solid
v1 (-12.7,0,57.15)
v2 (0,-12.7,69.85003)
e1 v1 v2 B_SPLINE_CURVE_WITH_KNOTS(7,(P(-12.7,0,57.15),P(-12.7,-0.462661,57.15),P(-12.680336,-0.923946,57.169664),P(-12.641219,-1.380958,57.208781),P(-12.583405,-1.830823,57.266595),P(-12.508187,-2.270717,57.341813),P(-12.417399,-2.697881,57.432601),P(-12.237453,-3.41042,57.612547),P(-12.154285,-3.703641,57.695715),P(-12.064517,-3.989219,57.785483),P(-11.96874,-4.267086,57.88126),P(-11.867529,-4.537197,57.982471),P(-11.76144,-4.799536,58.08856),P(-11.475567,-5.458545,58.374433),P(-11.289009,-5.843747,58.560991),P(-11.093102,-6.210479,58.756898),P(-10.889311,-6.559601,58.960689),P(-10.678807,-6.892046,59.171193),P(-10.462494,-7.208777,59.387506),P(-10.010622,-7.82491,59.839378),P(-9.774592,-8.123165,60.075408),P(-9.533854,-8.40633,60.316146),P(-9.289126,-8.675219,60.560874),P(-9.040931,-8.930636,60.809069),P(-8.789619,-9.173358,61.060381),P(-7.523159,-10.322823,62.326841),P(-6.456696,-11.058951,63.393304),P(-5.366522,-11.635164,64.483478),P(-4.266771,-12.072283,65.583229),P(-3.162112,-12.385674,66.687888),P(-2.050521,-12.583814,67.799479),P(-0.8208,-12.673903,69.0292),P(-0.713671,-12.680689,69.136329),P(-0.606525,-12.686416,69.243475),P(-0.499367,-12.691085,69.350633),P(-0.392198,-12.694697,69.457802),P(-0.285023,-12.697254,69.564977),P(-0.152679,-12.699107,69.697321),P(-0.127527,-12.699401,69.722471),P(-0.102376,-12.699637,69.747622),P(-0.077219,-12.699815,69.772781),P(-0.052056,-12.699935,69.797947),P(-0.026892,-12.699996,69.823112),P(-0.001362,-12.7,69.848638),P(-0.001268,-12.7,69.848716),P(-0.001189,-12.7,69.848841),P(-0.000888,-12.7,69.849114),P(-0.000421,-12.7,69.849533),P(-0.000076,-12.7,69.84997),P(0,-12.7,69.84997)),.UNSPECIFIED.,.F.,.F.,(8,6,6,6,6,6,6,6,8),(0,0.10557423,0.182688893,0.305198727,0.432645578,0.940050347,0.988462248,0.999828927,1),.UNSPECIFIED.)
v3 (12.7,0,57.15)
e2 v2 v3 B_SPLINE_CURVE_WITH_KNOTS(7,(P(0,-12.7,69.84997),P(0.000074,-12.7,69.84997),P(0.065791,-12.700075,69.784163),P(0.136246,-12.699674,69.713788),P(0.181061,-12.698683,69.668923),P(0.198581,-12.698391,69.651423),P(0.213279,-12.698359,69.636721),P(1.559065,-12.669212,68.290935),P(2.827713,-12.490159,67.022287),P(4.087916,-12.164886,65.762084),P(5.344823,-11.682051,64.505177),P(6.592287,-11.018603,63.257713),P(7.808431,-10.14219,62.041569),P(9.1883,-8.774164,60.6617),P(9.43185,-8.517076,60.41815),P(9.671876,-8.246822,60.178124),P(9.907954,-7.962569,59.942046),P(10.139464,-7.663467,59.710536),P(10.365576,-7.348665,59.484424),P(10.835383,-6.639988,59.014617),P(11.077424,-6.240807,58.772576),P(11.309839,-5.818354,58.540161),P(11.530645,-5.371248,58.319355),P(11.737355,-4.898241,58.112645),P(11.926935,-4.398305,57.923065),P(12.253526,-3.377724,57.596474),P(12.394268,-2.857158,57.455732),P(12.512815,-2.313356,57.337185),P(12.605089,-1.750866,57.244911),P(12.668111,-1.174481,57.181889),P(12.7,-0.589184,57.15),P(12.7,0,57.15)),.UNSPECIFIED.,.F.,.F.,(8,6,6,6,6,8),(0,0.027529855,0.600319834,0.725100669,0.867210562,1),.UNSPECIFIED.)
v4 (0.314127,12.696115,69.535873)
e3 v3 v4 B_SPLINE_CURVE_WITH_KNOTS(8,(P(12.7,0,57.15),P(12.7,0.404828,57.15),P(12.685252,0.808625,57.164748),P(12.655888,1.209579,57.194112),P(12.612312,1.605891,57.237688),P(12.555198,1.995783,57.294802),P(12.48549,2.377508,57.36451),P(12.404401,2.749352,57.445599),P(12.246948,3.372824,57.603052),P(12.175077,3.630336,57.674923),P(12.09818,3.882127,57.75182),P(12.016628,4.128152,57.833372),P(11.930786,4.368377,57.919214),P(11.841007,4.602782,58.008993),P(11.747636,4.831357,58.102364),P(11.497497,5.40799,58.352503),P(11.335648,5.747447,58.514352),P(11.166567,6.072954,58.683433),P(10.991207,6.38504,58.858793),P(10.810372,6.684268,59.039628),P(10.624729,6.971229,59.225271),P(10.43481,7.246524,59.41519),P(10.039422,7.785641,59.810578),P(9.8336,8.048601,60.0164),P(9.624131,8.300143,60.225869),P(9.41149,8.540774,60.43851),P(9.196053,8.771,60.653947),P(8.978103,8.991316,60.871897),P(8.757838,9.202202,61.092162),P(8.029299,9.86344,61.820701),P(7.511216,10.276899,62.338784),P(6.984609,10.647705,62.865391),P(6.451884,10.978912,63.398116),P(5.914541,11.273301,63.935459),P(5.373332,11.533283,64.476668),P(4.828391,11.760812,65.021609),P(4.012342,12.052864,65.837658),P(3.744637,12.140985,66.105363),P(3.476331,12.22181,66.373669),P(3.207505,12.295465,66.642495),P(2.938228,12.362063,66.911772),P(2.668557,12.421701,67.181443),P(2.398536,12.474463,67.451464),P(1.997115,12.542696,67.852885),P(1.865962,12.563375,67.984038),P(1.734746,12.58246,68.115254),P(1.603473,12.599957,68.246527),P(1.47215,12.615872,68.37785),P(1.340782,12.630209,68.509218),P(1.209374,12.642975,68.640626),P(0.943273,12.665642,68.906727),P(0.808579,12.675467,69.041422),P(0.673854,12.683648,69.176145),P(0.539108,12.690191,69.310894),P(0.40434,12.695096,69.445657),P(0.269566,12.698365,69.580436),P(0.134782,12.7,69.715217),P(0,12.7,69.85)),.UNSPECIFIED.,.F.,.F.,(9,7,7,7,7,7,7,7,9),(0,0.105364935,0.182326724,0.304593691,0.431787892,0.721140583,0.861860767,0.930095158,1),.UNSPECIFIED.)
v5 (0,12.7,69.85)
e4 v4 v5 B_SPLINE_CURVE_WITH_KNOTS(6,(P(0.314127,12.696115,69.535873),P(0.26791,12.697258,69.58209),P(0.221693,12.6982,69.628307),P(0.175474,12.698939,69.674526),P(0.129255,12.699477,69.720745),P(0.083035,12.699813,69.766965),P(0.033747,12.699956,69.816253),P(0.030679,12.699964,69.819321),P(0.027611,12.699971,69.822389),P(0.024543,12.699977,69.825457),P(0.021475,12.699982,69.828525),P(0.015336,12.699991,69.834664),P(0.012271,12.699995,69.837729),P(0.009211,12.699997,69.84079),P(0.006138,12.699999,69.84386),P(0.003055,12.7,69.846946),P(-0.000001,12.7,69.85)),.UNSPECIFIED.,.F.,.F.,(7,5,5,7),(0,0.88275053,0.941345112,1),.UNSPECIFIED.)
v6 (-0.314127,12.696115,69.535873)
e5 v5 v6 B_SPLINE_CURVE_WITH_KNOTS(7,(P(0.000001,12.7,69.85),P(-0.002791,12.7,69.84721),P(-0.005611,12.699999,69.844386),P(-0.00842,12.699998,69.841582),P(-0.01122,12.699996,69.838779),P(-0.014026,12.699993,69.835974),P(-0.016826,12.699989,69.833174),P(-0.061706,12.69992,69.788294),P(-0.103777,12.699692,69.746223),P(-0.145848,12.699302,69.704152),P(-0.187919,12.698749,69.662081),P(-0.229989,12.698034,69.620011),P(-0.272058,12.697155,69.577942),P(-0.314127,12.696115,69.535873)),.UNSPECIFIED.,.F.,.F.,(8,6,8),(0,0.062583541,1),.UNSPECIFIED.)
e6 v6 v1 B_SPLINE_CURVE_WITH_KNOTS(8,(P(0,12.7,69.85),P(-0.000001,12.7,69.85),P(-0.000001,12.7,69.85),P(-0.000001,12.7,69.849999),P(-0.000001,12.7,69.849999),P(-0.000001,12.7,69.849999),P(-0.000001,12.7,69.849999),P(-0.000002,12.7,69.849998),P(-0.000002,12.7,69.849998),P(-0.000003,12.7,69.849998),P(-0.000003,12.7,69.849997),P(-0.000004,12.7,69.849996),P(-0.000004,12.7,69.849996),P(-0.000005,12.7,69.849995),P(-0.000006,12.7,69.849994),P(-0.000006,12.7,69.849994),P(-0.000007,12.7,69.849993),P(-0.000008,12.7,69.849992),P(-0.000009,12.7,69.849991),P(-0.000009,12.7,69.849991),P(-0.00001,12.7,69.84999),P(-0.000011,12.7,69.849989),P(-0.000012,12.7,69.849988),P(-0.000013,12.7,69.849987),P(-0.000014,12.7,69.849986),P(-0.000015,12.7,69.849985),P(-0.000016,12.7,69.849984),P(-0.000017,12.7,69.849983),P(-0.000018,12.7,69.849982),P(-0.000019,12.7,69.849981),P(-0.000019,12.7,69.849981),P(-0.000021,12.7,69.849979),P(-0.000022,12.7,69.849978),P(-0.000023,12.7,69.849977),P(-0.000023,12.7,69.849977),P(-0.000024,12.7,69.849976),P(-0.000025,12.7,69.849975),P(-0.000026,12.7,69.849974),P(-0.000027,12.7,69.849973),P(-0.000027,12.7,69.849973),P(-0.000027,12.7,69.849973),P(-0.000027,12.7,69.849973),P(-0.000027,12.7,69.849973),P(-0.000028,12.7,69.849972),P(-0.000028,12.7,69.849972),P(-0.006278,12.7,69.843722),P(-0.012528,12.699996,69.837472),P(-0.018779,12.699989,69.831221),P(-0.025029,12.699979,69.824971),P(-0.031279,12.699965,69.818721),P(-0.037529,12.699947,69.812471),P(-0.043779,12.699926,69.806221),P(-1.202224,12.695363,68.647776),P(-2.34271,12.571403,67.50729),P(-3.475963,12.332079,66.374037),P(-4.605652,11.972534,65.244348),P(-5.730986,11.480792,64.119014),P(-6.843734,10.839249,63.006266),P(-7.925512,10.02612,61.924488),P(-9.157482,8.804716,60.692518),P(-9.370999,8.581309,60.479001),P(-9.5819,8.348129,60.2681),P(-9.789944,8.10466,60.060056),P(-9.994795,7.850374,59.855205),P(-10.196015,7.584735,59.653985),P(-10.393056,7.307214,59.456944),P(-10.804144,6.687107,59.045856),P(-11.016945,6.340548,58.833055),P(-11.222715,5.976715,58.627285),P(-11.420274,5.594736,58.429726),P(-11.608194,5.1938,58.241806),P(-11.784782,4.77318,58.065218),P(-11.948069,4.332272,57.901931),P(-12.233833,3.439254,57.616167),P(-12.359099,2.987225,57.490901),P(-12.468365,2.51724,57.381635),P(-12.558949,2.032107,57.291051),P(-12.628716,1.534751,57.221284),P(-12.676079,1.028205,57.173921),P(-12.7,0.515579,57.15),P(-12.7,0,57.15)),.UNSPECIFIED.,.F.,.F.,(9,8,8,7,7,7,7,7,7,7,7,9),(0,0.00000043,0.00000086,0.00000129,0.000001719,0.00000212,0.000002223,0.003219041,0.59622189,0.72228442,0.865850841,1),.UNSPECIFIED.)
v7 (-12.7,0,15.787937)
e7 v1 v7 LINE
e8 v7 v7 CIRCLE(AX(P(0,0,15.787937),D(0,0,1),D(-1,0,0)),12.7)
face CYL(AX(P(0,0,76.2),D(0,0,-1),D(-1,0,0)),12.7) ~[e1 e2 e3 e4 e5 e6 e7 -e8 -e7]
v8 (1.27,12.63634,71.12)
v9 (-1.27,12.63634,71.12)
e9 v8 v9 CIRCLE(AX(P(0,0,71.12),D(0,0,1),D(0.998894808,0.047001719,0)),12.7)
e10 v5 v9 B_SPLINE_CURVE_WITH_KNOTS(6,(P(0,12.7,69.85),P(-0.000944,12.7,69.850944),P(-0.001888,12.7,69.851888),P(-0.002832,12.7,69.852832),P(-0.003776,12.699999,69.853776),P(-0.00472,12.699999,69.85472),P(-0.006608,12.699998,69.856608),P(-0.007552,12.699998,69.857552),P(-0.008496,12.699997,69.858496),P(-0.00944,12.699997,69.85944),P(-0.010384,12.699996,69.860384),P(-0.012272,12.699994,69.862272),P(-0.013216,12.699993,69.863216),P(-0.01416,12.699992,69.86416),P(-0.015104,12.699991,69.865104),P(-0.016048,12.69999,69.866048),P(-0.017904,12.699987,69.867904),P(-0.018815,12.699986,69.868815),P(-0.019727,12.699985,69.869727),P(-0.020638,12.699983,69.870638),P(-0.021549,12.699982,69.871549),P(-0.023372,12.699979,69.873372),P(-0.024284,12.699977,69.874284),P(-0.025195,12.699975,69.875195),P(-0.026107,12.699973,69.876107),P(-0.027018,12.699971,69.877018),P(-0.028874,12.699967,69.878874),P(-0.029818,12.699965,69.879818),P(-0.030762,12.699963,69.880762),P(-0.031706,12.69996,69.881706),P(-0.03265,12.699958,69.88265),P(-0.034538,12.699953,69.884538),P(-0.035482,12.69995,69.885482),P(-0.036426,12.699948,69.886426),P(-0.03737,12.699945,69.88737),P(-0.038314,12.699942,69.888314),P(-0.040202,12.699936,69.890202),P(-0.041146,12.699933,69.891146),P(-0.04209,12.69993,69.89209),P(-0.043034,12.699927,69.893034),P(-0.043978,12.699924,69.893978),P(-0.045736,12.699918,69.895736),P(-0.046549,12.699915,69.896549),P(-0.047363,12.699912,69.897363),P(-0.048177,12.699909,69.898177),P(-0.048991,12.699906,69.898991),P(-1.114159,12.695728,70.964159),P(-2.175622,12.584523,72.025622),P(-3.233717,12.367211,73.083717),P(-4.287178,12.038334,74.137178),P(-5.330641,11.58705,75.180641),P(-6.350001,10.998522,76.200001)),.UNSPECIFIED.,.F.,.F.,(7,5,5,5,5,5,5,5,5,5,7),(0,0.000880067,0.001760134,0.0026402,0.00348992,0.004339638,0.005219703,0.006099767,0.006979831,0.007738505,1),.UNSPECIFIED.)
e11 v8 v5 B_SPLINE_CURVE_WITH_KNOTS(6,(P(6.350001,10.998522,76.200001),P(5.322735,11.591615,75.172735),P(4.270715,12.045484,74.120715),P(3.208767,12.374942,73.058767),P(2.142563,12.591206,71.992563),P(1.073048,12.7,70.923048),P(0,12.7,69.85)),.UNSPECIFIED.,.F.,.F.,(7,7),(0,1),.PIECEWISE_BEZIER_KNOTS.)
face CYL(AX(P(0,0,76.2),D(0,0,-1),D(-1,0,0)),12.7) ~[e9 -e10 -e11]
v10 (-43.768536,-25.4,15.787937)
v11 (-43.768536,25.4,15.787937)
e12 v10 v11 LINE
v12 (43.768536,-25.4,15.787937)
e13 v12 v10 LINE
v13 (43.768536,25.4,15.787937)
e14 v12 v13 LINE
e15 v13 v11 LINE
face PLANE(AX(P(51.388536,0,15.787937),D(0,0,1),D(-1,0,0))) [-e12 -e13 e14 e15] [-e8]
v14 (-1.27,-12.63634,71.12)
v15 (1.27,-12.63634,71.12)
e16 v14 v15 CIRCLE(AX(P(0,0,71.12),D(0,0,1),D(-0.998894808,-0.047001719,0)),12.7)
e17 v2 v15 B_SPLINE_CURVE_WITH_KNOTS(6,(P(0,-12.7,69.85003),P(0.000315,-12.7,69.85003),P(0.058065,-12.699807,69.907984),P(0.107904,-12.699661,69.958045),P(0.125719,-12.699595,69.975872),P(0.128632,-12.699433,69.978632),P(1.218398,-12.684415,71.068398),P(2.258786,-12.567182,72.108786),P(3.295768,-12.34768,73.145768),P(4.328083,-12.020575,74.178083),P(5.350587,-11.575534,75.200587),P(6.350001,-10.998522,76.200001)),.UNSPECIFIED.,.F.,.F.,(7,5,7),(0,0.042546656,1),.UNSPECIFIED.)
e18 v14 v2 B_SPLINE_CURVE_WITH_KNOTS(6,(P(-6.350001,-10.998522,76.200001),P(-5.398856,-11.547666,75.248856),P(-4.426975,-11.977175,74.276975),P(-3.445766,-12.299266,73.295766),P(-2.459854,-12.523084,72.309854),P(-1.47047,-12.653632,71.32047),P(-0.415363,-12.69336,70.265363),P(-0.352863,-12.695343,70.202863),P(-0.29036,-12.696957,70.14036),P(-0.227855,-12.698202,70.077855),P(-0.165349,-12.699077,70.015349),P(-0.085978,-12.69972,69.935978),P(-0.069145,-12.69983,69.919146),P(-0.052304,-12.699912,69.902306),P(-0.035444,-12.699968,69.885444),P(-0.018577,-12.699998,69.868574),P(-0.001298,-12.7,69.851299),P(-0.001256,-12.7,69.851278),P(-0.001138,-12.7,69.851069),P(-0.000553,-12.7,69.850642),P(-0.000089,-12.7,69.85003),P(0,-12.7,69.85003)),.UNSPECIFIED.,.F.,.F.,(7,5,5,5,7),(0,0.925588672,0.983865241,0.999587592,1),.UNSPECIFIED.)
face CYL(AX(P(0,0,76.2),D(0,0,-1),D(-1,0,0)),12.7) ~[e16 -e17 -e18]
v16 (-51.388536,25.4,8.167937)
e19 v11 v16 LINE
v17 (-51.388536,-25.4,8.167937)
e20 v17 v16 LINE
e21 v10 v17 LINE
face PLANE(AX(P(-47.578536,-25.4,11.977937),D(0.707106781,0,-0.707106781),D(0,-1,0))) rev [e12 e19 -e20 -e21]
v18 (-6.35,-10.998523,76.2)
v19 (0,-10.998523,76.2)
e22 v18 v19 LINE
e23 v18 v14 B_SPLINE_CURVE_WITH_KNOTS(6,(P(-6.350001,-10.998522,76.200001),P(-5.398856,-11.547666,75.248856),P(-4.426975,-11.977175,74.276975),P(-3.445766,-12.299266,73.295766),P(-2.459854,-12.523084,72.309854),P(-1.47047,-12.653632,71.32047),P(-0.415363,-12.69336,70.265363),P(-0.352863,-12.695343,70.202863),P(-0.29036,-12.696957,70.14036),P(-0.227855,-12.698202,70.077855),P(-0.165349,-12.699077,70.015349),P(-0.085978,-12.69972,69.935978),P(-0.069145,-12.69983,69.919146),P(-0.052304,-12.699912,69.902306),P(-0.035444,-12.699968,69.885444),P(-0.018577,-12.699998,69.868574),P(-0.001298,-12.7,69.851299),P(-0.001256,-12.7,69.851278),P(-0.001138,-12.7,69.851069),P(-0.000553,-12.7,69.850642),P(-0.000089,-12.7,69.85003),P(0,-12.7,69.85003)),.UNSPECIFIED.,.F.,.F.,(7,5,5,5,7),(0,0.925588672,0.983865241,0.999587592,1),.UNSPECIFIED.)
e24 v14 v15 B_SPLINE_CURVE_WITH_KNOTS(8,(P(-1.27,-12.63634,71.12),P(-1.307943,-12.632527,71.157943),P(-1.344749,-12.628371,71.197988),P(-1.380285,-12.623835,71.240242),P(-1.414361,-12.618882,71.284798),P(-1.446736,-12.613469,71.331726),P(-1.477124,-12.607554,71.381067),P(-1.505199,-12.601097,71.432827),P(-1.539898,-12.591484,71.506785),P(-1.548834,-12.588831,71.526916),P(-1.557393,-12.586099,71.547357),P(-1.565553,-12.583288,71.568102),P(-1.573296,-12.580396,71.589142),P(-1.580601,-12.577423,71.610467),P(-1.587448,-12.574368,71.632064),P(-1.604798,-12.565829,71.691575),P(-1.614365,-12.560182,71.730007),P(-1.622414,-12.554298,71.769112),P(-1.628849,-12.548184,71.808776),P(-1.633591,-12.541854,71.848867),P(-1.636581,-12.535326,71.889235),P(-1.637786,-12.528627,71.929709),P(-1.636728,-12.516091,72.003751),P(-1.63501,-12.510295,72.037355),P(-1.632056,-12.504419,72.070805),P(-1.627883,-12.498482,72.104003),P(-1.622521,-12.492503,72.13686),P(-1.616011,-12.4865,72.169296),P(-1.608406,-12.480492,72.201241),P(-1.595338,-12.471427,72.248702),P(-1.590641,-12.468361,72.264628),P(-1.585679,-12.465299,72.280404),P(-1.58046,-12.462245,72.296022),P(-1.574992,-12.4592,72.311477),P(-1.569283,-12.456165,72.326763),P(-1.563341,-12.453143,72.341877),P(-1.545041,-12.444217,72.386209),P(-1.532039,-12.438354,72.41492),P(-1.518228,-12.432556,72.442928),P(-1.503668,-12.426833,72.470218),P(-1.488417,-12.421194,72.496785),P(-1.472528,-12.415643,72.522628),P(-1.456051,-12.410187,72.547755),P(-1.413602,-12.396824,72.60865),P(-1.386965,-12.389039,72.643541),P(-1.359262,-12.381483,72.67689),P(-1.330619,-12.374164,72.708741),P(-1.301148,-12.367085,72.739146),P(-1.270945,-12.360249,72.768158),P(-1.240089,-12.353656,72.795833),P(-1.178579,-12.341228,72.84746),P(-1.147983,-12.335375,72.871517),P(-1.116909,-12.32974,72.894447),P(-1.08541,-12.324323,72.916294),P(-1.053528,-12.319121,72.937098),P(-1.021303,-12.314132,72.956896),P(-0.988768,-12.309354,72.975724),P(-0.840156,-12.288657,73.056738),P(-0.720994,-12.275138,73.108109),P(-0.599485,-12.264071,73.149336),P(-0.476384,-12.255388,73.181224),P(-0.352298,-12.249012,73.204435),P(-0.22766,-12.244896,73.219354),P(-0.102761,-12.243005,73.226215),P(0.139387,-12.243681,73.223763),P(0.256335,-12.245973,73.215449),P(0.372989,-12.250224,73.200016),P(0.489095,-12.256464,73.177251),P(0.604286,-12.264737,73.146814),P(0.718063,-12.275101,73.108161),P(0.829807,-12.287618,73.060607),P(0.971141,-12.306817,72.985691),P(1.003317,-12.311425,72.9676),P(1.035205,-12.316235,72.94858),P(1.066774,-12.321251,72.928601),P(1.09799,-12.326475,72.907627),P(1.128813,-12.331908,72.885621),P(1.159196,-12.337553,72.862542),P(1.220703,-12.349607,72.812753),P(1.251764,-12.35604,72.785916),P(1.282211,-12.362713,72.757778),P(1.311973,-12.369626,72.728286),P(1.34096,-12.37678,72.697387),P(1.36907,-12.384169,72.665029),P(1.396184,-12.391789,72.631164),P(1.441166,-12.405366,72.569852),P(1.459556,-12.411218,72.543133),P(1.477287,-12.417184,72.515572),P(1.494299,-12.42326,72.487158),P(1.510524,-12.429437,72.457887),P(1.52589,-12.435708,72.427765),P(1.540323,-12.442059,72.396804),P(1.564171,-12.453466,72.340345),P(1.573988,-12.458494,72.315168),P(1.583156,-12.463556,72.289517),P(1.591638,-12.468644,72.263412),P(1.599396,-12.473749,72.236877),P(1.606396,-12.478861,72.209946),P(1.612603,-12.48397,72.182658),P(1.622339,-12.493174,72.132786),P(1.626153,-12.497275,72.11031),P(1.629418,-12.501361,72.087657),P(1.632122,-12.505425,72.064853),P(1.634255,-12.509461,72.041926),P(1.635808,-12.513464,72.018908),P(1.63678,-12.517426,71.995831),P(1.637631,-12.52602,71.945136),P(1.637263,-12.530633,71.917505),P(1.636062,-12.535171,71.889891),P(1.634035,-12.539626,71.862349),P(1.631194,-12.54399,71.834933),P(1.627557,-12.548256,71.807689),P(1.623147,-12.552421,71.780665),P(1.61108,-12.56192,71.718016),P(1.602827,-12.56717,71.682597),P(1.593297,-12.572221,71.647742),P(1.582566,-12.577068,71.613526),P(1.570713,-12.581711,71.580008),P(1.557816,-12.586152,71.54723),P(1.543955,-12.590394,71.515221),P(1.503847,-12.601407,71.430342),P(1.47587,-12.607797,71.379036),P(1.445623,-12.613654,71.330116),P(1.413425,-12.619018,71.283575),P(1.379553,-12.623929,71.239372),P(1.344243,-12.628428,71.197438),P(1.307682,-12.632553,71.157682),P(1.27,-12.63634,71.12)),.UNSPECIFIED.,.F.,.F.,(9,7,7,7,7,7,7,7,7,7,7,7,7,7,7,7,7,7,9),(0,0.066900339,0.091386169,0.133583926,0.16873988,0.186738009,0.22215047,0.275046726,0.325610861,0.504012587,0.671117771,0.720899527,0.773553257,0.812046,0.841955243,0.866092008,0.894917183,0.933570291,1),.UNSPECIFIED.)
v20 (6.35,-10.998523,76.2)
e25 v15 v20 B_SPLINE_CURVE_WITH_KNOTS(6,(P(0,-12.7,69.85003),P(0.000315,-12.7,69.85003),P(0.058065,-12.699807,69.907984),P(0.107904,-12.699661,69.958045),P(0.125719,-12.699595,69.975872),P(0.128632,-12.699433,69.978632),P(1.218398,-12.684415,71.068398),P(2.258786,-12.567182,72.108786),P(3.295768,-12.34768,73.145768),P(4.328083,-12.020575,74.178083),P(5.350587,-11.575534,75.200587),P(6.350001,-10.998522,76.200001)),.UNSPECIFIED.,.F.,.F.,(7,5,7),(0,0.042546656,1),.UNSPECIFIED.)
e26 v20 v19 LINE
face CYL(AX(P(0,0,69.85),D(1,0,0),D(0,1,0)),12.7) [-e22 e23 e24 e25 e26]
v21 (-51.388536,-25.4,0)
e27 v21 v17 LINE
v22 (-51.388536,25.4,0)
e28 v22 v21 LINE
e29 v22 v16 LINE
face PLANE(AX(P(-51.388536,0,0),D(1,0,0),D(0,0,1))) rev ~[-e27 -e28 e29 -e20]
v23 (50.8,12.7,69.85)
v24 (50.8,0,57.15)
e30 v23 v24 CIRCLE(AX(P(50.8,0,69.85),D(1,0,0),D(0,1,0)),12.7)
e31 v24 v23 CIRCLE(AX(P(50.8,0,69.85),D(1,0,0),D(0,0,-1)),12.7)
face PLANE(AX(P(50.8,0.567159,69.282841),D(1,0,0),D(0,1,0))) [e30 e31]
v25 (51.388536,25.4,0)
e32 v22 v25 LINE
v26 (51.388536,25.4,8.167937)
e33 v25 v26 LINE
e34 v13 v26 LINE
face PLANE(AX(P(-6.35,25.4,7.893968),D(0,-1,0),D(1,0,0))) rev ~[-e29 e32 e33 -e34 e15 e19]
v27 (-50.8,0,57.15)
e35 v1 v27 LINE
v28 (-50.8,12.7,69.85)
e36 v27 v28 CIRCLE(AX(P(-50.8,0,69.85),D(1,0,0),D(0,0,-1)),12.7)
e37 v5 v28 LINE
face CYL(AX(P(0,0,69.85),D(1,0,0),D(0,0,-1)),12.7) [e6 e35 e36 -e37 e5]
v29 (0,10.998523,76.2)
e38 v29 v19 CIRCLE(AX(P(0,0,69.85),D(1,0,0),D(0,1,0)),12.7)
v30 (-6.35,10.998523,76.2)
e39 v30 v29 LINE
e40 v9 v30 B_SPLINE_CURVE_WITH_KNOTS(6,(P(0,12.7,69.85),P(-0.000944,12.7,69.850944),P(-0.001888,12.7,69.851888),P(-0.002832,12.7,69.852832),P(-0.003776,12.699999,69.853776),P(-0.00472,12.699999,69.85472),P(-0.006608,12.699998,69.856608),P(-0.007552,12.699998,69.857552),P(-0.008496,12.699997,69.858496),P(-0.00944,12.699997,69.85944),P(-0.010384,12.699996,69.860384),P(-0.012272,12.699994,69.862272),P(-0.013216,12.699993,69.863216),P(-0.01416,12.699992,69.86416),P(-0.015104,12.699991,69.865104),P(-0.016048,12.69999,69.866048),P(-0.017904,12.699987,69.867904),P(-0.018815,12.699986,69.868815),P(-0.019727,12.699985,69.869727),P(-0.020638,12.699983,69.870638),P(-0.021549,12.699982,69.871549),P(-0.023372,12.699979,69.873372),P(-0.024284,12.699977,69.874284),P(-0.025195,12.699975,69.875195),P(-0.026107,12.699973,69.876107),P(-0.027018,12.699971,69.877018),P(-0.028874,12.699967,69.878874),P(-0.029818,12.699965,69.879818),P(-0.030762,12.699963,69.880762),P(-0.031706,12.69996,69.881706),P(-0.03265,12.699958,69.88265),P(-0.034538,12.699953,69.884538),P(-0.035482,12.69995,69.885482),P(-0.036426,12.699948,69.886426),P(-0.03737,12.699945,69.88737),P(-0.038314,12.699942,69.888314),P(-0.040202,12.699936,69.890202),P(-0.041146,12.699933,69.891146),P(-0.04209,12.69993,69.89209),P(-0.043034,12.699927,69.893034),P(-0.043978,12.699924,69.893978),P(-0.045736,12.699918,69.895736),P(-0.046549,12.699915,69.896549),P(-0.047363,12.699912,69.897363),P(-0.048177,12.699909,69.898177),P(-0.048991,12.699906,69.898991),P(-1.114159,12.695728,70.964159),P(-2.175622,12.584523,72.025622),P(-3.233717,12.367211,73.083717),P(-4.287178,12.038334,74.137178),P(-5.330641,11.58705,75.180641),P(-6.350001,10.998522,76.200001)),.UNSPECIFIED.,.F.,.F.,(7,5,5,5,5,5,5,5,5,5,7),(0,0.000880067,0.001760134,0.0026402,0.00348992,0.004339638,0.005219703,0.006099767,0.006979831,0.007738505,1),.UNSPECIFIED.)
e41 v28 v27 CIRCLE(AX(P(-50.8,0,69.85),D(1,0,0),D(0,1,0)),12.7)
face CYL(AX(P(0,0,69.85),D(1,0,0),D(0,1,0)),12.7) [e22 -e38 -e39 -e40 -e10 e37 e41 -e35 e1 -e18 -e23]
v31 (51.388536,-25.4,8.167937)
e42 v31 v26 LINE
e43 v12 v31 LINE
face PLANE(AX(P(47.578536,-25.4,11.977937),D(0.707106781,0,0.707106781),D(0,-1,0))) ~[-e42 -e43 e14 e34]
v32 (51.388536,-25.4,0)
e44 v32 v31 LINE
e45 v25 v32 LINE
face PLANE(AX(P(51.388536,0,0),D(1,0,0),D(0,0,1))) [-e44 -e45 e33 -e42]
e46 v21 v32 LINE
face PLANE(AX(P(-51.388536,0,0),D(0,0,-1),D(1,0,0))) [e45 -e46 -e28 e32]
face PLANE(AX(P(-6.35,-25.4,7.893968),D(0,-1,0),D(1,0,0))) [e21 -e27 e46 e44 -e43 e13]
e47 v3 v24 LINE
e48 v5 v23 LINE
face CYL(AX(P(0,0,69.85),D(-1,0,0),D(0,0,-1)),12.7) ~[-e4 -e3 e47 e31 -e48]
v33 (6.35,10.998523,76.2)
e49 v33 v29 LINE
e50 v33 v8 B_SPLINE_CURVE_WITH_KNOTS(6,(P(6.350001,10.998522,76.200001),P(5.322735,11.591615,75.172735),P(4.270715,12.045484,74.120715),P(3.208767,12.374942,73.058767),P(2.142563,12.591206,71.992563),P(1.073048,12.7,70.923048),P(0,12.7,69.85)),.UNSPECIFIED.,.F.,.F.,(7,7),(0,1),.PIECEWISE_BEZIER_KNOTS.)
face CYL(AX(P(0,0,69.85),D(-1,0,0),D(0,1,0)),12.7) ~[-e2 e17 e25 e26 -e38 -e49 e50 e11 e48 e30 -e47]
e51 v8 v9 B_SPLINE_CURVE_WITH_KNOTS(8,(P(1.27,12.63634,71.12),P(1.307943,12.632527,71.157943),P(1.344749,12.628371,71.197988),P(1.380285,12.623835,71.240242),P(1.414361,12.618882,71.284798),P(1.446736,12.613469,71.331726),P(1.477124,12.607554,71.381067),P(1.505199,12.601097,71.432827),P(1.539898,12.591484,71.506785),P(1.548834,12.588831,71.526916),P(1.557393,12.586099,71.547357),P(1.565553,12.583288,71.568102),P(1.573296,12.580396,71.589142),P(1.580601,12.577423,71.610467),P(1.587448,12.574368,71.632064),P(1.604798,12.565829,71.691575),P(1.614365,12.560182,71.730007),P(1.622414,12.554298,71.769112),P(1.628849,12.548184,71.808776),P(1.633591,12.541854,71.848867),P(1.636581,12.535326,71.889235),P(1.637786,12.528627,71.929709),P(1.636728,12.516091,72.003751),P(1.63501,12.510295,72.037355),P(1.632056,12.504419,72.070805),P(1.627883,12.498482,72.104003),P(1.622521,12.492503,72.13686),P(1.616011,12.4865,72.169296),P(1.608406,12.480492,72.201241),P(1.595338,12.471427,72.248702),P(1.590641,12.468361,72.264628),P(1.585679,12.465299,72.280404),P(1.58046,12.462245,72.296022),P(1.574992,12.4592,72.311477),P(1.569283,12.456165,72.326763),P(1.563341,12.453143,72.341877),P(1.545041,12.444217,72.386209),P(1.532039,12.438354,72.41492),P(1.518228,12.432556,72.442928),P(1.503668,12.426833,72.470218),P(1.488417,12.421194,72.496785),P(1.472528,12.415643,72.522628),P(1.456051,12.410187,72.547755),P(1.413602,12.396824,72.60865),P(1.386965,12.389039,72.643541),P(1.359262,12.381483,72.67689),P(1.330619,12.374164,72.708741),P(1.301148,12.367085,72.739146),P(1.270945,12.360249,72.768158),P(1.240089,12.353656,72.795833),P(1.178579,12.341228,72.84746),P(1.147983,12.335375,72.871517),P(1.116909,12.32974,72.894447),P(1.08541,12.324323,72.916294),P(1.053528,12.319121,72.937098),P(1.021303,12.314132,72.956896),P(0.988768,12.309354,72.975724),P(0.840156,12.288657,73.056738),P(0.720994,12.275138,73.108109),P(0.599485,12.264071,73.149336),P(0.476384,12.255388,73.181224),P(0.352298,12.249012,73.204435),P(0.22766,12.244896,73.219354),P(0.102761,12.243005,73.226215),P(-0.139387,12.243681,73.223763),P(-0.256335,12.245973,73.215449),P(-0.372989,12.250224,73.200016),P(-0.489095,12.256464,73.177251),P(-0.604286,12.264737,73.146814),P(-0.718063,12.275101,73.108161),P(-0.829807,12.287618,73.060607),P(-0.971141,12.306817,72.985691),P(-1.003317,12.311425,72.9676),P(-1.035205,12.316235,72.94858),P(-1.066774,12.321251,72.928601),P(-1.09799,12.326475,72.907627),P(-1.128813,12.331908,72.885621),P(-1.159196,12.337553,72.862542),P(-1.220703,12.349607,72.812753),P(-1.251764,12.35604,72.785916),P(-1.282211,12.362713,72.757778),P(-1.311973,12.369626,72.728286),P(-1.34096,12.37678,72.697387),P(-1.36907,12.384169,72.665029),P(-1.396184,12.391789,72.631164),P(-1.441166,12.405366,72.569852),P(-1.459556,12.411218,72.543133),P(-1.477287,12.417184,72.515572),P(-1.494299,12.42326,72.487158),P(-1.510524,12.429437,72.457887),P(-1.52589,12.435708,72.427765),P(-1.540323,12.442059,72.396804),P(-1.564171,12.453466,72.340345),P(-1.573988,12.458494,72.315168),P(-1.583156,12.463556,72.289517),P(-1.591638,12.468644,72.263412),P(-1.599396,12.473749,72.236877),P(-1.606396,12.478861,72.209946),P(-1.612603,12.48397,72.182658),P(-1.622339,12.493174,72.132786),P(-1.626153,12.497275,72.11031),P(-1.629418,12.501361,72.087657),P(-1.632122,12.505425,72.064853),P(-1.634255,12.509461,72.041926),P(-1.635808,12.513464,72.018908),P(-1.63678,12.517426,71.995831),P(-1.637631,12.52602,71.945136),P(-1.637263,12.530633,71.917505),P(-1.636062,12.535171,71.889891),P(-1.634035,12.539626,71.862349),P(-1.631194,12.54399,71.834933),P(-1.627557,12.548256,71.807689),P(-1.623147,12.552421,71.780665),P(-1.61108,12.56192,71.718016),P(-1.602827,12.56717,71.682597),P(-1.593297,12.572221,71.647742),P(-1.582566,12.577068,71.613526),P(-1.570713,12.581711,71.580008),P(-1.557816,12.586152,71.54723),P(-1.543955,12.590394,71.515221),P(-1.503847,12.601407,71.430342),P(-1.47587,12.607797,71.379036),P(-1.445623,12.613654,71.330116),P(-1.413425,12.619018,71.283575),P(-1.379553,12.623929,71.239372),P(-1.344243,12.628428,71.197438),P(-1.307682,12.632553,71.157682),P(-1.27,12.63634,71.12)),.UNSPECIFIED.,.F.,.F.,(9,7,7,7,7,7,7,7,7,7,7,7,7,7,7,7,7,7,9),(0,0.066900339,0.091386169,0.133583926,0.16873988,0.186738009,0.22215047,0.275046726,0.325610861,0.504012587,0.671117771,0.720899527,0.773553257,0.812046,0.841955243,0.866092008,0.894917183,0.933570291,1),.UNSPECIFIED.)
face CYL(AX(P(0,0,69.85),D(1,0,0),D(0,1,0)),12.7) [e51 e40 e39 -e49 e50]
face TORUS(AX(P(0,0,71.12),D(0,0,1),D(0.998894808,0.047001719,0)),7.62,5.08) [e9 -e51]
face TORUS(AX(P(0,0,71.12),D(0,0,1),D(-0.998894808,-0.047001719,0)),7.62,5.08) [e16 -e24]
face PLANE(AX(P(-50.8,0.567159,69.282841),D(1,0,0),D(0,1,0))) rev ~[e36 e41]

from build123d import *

# Parameters (mm, degrees)
F0_W         = 12.7
F0_H         = 6.35
F0_H_2       = 47.7120632529
F0_H_3       = 15.7879367471
F0_W_2       = 38.6885356486
F2_DEPTH     = 25.4
F4_DEPTH     = 50.8
F5_SIZE      = 7.62
F6_T4_ANGLE  = 174.612014659
F6_S5_R      = 12.7
F6_T6_DEPTH  = 17
F6_T10_ANGLE = 174.612014659
F6_S11_R     = 12.7
F6_T12_DEPTH = 17


# Not quite as in the source:
# - a fillet or chamfer that OpenCascade refuses, or shapes differently, is made with other operations: its cross-section is extruded or revolved along the edge and cut away or added


with BuildPart() as f1:
    # F0 (on Front) → F1 (revolve)
    with BuildSketch(Plane.XZ):
        with Locations((-6.35, 73.025)):
            Rectangle(F0_W, F0_H)
        with Locations((-6.35, 66.675)):
            Rectangle(F0_W, F0_H)
        with Locations((-6.35, 39.6439683735)):
            Rectangle(F0_W, F0_H_2)
    revolve(axis=Axis((0, 0, 38.1), (0, 0, 1)))

    # F0 (on Front) → F2 (join, symmetric)
    with BuildSketch(Plane.XZ):
        with Locations((-6.35, 7.8939683735)):
            Rectangle(F0_W, F0_H_3)
        with Locations((6.35, 7.8939683735)):
            Rectangle(F0_W, F0_H_3)
        with Locations((-32.0442678243, 7.8939683735)):
            Rectangle(F0_W_2, F0_H_3)
        with Locations((32.0442678243, 7.8939683735)):
            Rectangle(F0_W_2, F0_H_3)
    extrude(amount=F2_DEPTH, both=True)

    # F3 (on Right) → F4 (join, symmetric)
    with BuildSketch(Plane.YZ):
        with BuildLine():
            ThreePointArc((0, 57.15), (8.9802561211, 60.8697438789), (12.7, 69.85))
            ThreePointArc((12.7, 69.85), (-8.9802561211, 78.8302561211), (0, 57.15))
        make_face()
    extrude(amount=F4_DEPTH, both=True)

    # F5
    f5_edges = [f1.edges().sort_by_distance(p)[0] for p in [
        (-51.388536, 0, 15.787937),
        (51.388536, 0, 15.787937),
    ]]
    chamfer(f5_edges, length=F5_SIZE)

    # F6: fillet of radius 5.08 on 3 edges, made by hand


with BuildPart() as f6_tool2:
    # F6_s3 → F6_t4 (revolve)
    with BuildSketch(Plane(origin=(0, 0, 0), x_dir=(0, 0, 1), z_dir=(0.0470017192, -0.9988948085, 0))):
        with BuildLine():
            ThreePointArc((71.12, -12.7), (74.7121024484, -11.2121024484), (76.2, -7.62))
            Line((76.2, -7.62), (76.2, -12.7))
            Line((76.2, -12.7), (71.12, -12.7))
        make_face()
    revolve(axis=Axis((0, 0, 76.2), (0, 0, 1)), revolution_arc=F6_T4_ANGLE)

    # F6_s5 → F6_t6 (cut, symmetric)
    with BuildSketch(Plane.YZ):
        with Locations((0, 69.85)):
            Circle(F6_S5_R)
    extrude(amount=F6_T6_DEPTH, both=True, mode=Mode.SUBTRACT)


with BuildPart() as f1_1:
    add(f1.part)

    # F6_t1: cut F6_tool2
    add(f6_tool2.part, mode=Mode.SUBTRACT)


with BuildPart() as f6_tool8:
    # F6_s9 → F6_t10 (revolve)
    with BuildSketch(Plane(origin=(0, 0, 0), x_dir=(0, 0, 1), z_dir=(-0.0470017192, 0.9988948085, 0))):
        with BuildLine():
            ThreePointArc((71.12, -12.7), (74.7121024484, -11.2121024484), (76.2, -7.62))
            Line((76.2, -7.62), (76.2, -12.7))
            Line((76.2, -12.7), (71.12, -12.7))
        make_face()
    revolve(axis=Axis((0, 0, 76.2), (0, 0, 1)), revolution_arc=F6_T10_ANGLE)

    # F6_s11 → F6_t12 (cut, symmetric)
    with BuildSketch(Plane.YZ):
        with Locations((0, 69.85)):
            Circle(F6_S11_R)
    extrude(amount=F6_T12_DEPTH, both=True, mode=Mode.SUBTRACT)


with BuildPart() as f1_2:
    add(f1_1.part)

    # F6_t7: cut F6_tool8
    add(f6_tool8.part, mode=Mode.SUBTRACT)


solid = f1_2.part
